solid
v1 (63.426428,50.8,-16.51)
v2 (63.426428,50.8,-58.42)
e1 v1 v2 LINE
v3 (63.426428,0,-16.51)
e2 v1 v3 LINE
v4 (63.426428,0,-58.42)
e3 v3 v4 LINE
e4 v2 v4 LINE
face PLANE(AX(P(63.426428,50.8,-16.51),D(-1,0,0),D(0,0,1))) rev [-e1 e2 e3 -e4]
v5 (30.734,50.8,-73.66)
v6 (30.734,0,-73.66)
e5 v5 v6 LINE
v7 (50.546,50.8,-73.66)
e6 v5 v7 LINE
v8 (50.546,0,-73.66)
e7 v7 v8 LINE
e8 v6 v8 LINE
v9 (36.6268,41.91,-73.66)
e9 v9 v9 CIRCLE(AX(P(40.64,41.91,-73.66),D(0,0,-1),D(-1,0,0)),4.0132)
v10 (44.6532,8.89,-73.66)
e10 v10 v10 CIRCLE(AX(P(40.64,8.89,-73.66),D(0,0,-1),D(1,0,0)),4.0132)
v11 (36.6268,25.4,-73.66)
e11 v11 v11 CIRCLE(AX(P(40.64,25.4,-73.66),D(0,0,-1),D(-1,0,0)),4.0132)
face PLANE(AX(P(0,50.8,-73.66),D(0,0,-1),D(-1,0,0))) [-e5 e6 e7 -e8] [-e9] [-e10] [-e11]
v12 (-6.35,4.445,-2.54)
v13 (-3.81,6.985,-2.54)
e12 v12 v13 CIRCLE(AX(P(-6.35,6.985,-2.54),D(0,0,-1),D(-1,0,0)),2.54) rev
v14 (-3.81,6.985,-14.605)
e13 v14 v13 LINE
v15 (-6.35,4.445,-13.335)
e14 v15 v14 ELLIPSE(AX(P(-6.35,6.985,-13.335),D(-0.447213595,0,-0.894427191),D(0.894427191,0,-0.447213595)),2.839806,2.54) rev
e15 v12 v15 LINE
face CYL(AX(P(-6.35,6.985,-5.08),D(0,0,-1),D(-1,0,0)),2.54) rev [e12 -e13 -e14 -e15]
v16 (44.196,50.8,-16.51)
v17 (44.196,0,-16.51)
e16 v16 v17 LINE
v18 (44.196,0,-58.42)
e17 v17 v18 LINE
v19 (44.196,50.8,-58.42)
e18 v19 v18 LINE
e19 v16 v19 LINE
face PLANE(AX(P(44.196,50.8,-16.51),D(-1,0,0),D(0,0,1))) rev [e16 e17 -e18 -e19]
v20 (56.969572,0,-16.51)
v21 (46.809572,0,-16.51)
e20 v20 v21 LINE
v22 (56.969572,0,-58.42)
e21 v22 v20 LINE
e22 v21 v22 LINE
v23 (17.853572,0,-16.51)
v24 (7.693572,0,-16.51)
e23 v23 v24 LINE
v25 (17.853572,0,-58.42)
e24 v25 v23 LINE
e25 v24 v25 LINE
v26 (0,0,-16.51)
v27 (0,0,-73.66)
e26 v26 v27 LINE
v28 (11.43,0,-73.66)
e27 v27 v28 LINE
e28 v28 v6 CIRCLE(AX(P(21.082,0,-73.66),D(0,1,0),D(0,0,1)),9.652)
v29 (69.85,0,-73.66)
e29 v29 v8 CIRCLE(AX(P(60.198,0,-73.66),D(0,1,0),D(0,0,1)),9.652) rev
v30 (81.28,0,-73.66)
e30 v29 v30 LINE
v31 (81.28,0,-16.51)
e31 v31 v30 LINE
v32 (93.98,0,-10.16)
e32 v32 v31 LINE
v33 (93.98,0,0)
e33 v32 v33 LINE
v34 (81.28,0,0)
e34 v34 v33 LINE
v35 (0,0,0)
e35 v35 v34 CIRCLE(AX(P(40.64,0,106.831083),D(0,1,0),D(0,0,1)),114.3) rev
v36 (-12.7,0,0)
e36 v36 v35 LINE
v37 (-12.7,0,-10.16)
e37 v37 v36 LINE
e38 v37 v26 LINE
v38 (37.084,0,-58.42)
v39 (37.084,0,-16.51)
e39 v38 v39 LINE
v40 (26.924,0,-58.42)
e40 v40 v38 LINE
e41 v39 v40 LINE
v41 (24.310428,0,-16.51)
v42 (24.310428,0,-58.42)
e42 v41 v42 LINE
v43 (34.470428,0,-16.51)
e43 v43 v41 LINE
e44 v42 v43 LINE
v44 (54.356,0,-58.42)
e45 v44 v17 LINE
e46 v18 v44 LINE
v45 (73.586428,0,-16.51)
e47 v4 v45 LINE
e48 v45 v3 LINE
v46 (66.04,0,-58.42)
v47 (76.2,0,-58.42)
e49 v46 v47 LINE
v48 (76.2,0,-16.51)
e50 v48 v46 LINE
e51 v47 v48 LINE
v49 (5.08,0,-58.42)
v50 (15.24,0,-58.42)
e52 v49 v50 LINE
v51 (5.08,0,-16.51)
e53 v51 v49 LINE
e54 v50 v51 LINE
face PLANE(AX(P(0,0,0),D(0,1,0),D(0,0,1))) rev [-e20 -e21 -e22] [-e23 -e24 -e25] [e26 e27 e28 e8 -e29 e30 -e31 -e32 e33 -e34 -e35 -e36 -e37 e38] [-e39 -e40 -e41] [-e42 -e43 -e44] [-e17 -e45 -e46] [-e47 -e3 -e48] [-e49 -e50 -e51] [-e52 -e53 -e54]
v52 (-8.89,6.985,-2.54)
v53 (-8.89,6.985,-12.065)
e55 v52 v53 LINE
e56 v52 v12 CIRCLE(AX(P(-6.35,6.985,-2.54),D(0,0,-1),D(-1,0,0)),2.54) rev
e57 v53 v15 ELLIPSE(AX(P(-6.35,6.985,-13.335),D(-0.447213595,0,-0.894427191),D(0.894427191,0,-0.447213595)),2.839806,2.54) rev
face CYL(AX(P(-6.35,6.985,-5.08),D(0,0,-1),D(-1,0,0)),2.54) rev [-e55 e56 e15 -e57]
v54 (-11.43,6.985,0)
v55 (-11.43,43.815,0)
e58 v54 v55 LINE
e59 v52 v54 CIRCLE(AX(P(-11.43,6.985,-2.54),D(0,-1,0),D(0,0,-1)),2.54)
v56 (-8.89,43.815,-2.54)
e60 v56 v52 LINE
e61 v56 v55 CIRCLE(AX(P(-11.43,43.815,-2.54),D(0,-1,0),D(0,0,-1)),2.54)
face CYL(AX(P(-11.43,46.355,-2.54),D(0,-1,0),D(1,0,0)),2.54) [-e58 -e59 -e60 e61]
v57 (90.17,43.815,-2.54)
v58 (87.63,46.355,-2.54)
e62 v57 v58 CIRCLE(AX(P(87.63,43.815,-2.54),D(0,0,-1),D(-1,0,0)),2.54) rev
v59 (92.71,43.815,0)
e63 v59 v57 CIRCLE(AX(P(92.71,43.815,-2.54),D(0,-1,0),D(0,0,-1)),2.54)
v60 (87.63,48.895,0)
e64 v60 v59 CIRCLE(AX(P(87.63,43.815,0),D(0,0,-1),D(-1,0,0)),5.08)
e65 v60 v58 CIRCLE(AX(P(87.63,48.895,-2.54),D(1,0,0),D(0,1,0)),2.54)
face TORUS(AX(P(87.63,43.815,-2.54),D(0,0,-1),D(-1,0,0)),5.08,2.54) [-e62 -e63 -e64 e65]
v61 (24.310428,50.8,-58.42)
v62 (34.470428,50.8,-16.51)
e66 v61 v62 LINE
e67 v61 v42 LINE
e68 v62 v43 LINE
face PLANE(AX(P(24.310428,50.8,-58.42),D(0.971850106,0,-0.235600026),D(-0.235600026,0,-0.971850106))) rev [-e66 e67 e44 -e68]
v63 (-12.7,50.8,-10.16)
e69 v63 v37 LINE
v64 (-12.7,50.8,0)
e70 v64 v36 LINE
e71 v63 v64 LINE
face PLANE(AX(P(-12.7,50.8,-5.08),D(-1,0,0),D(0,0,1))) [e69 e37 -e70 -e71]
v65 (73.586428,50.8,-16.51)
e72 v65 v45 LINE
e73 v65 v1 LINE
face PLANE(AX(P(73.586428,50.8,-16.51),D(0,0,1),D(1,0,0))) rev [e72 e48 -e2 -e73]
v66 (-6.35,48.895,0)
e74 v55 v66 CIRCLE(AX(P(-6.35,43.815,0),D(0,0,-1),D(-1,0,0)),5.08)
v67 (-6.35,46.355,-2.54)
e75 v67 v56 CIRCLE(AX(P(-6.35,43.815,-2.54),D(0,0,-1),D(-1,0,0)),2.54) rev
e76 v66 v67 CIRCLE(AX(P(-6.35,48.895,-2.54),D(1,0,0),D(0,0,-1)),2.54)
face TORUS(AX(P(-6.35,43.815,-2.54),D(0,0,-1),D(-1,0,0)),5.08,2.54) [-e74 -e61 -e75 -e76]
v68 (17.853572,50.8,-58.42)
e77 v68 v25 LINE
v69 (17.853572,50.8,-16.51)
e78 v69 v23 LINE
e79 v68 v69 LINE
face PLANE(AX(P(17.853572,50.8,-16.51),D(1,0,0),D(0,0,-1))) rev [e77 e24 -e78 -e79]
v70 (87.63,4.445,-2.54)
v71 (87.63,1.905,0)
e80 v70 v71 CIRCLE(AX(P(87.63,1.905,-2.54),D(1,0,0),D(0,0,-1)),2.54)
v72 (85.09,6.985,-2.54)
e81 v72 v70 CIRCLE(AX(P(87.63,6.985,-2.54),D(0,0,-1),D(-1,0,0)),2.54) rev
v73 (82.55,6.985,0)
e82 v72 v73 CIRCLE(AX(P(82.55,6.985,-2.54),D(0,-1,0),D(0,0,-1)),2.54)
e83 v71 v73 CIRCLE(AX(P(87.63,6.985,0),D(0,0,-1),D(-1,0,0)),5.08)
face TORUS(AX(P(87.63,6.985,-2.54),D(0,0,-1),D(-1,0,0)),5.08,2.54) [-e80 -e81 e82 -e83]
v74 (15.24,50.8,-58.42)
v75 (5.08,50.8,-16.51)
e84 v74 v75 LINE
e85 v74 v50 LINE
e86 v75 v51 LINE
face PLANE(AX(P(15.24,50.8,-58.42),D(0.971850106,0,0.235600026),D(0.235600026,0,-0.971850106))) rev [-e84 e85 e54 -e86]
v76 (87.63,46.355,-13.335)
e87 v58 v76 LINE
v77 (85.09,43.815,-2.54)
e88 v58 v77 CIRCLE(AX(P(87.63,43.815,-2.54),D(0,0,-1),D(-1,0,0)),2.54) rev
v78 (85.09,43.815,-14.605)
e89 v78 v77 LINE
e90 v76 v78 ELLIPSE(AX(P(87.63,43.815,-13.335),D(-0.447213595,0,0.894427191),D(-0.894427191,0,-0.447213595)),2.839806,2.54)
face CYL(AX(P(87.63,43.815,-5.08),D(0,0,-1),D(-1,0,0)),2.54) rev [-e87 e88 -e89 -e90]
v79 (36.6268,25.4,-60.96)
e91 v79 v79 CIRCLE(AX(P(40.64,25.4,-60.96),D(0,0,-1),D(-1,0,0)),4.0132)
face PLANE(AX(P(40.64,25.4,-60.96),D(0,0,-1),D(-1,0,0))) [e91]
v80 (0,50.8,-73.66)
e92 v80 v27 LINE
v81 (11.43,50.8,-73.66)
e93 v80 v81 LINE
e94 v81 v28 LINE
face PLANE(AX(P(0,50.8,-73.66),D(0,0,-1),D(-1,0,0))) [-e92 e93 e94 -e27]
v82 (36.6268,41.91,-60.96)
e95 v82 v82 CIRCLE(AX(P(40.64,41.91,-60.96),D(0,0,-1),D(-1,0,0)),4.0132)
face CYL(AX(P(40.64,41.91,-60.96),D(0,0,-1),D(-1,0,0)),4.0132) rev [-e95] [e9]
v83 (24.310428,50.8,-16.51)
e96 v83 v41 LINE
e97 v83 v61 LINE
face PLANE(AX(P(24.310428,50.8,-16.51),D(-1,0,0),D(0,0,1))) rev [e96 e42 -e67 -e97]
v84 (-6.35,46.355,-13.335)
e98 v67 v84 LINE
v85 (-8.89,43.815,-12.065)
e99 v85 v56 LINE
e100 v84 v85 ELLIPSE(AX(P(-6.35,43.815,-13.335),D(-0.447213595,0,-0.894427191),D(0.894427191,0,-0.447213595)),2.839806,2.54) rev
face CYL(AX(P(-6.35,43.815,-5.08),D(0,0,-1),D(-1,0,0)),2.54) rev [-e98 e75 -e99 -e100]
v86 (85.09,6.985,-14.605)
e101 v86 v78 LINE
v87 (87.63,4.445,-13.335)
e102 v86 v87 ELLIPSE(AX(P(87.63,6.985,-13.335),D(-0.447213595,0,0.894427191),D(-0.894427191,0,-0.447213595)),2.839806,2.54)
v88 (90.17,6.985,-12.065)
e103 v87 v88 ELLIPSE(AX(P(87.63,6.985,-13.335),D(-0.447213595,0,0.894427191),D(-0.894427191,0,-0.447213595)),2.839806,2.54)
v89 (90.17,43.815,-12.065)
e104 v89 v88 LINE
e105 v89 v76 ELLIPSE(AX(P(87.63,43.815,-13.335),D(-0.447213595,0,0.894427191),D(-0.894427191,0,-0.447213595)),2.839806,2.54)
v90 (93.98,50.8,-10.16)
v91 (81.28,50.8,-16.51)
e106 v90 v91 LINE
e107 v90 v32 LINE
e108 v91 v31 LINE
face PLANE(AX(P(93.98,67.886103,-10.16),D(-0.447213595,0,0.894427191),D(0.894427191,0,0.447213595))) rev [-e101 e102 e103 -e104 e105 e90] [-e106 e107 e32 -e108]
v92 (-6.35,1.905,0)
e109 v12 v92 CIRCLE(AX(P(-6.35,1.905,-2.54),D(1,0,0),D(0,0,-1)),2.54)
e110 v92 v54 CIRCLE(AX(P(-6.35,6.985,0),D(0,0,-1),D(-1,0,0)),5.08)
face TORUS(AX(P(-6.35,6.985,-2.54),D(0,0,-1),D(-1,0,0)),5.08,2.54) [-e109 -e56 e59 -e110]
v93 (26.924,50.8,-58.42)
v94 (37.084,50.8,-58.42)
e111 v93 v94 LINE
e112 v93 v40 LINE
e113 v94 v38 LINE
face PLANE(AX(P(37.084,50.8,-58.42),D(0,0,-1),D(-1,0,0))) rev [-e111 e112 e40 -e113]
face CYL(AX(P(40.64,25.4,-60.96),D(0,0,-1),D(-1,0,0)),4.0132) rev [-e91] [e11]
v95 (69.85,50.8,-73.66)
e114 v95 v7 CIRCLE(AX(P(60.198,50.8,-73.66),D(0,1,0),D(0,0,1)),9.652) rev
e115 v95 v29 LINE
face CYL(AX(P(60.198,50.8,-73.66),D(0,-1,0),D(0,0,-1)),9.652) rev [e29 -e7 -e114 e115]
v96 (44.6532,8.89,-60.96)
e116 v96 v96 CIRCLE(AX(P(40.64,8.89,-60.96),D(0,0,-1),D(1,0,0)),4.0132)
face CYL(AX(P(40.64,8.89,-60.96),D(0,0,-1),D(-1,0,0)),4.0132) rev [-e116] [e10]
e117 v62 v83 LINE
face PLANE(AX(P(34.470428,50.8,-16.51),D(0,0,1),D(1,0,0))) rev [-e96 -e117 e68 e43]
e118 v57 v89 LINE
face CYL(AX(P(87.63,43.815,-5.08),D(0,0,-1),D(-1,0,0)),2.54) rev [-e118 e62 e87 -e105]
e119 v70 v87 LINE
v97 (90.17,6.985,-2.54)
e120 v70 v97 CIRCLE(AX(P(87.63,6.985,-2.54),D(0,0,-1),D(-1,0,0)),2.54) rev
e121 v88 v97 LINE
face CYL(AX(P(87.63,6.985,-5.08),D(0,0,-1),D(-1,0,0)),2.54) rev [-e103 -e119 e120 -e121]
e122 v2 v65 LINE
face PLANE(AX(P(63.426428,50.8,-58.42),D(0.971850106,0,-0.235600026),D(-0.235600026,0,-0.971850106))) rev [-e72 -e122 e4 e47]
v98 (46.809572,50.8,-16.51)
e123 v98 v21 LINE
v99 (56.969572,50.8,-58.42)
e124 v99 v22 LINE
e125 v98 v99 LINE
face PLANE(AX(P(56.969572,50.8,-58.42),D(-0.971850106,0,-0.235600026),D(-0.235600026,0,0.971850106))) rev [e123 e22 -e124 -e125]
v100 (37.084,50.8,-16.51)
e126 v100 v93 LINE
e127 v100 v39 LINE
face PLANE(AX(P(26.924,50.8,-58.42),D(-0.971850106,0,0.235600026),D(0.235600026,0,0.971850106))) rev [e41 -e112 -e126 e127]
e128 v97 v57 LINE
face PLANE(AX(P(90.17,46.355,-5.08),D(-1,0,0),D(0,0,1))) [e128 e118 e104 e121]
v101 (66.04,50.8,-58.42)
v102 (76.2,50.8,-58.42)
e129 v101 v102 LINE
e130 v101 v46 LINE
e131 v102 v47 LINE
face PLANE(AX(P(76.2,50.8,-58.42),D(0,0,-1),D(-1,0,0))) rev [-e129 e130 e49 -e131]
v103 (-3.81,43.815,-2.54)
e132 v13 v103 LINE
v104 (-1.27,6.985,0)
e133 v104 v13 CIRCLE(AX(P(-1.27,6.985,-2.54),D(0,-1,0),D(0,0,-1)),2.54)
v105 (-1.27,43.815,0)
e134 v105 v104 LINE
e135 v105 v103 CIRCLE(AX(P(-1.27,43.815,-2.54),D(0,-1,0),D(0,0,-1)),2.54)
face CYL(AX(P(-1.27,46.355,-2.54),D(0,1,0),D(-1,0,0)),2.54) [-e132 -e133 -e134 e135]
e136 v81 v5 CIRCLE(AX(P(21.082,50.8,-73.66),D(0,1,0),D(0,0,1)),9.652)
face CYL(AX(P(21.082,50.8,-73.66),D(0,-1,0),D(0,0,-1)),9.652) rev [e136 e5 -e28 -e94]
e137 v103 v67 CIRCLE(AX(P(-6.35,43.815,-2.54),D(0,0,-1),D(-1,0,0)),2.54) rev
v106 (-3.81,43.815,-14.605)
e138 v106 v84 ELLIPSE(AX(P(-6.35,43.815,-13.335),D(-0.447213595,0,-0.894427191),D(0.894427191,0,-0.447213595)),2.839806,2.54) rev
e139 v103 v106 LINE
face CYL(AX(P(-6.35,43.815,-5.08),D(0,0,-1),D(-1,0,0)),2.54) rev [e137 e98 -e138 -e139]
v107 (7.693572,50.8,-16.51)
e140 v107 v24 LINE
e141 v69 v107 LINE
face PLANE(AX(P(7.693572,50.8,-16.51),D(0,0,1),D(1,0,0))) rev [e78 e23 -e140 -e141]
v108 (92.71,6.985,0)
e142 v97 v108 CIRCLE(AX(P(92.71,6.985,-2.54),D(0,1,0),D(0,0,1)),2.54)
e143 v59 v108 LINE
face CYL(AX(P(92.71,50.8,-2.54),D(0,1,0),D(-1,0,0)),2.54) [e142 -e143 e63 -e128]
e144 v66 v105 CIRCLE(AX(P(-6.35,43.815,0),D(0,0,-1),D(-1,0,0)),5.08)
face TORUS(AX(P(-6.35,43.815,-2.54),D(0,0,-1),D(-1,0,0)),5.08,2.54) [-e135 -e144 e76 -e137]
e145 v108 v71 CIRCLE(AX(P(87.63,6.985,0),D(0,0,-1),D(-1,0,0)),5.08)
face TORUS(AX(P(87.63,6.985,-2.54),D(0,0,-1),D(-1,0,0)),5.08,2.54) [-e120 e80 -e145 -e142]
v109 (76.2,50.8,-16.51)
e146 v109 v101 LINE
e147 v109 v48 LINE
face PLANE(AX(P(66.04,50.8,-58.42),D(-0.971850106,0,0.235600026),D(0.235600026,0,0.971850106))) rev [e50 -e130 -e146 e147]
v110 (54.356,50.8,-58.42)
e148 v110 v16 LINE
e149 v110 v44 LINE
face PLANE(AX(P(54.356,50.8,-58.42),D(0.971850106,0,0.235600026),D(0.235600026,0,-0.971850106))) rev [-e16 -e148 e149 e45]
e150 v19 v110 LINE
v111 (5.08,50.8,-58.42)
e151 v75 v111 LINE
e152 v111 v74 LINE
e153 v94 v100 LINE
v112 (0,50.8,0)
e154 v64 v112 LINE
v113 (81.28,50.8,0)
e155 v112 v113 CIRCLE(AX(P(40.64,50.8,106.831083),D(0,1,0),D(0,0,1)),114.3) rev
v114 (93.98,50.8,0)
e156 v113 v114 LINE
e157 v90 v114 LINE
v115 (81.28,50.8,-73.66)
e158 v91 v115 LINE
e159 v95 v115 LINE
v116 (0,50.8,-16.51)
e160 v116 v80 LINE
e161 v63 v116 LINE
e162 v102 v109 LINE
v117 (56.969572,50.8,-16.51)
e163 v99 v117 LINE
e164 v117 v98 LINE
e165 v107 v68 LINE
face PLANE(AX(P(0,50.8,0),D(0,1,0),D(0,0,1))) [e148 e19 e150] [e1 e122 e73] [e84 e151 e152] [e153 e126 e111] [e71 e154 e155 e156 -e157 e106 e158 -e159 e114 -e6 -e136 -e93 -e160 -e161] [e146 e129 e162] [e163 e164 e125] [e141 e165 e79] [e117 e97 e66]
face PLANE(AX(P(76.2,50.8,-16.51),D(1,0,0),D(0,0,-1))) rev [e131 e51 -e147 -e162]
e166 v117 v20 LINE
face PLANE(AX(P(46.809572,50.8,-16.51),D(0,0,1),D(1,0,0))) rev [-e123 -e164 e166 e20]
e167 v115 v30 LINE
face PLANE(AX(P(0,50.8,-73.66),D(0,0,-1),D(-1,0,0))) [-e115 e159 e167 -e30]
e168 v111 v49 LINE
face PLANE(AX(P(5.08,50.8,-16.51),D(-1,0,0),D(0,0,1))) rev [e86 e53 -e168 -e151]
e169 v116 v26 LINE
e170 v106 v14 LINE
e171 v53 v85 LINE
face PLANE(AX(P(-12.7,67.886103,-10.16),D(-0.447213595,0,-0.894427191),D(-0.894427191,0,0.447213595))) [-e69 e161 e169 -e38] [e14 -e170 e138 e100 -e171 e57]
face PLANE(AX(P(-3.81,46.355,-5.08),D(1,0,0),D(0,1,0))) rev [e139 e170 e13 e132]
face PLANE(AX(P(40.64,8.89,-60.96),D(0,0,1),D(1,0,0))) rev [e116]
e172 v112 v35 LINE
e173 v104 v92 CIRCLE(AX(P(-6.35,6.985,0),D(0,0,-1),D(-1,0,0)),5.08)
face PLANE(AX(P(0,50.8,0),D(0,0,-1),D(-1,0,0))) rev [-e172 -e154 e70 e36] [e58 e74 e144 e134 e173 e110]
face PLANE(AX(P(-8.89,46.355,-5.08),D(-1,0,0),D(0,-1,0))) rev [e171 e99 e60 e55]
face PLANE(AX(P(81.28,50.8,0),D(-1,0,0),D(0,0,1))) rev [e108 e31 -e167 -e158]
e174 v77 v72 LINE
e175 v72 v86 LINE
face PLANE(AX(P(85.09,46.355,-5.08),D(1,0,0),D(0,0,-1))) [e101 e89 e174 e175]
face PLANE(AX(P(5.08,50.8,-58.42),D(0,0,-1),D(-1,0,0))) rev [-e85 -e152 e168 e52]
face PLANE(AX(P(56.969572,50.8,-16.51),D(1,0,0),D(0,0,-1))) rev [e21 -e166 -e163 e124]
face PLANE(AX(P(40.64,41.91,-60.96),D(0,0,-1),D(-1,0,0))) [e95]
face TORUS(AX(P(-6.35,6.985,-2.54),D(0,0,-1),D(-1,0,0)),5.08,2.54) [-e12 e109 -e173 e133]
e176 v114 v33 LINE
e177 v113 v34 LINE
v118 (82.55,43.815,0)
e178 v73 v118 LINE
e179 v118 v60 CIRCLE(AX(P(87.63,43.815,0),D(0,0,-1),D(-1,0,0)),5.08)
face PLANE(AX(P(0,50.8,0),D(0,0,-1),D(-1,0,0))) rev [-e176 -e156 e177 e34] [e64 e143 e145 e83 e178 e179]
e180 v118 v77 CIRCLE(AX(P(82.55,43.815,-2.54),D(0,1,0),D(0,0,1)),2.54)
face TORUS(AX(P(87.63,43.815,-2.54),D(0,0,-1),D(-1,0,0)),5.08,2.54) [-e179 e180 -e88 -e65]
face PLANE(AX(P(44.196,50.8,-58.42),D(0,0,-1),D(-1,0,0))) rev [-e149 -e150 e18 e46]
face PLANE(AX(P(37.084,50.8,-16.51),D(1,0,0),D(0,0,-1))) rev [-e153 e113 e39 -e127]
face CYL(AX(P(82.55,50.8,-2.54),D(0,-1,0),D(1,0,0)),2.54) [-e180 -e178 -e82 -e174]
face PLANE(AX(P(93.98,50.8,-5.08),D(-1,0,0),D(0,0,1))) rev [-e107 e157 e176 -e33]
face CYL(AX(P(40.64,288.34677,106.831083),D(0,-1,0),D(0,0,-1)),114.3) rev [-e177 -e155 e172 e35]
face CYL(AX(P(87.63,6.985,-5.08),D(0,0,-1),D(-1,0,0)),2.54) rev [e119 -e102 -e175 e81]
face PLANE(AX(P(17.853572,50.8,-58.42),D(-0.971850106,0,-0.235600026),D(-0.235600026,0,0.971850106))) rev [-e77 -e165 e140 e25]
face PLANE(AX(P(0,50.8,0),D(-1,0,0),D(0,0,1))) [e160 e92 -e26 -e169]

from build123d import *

# Parameters (mm, degrees)
BOSS_EXTRUDE1_DEPTH     = 50.8
SKETCH2_W               = 12.7
SKETCH2_H               = 50.8
SKETCH2_W_2             = 5.08
SKETCH2_H_2             = 41.91
BOSS_EXTRUDE2_DEPTH     = 5.08
CUT_EXTRUDE1_DEPTH      = 130.763924108
CUT_EXTRUDE1_DEPTH_BACK = 130.763924108
SKETCH5_R               = 4.0132
CUT_EXTRUDE2_DEPTH      = 12.7
BOSS_EXTRUDE3_DEPTH     = 50.8
CUT_EXTRUDE4_DEPTH      = 130.763924108
SKETCH10_W              = 5.08
SKETCH10_H              = 41.91
CUT_EXTRUDE5_DEPTH      = 127.949189836
FILLET1_R               = 2.54
FILLET2_R               = 2.54
FILLET3_R               = 2.54


with BuildPart() as part:
    # Sketch1 → Boss-Extrude1 (new body)
    with BuildSketch(Plane(origin=(0, 0, 0), x_dir=(1, 0, 0), z_dir=(0, 1, 0))):
        with BuildLine():
            Line((0, 0), (40.64, 0))
            Line((40.64, 0), (40.64, 73.66))
            Line((40.64, 73.66), (30.734, 73.66))
            ThreePointArc((30.734, 73.66), (21.082, 64.008), (11.43, 73.66))
            Line((11.43, 73.66), (0, 73.66))
            Line((0, 73.66), (0, 0))
        make_face()
        with BuildLine():
            Line((40.64, 73.66), (40.64, 0))
            Line((40.64, 0), (81.28, 0))
            Line((81.28, 0), (81.28, 73.66))
            Line((81.28, 73.66), (69.85, 73.66))
            ThreePointArc((69.85, 73.66), (60.198, 64.008), (50.546, 73.66))
            Line((50.546, 73.66), (40.64, 73.66))
        make_face()
    extrude(amount=BOSS_EXTRUDE1_DEPTH)

    # Sketch2 → Boss-Extrude2 (add)
    with BuildSketch(Plane.XY):
        with Locations((-6.35, 25.4)):
            Rectangle(SKETCH2_W, SKETCH2_H)
        with Locations((-6.35, 25.4)):
            Rectangle(SKETCH2_W_2, SKETCH2_H_2, mode=Mode.SUBTRACT)
    boss_extrude2 = extrude(amount=-BOSS_EXTRUDE2_DEPTH)

    # Mirror3: Boss-Extrude2 across plane
    add(boss_extrude2.mirror(Plane.ZY.offset(-40.64)))

    # Sketch4 → Cut-Extrude1 (cut, two sides: drawn at the far end of the back side and taken through both)
    with BuildSketch(Plane(origin=(0, 50.8, 0), x_dir=(1, 0, 0), z_dir=(0, 1, 0)).offset(-CUT_EXTRUDE1_DEPTH_BACK)):
        with BuildLine():
            Line((313.835320216, -88.467212956), (81.28, 0))
            ThreePointArc((81.28, 0), (40.64, 7.468916508), (0, 0))
            Line((0, 0), (-232.555320216, -88.467212956))
            Line((-232.555320216, -88.467212956), (-232.555320216, -586.095285833))
            Line((-232.555320216, -586.095285833), (313.835320216, -586.095285833))
            Line((313.835320216, -586.095285833), (313.835320216, -88.467212956))
        make_face()
    extrude(amount=CUT_EXTRUDE1_DEPTH + CUT_EXTRUDE1_DEPTH_BACK, mode=Mode.SUBTRACT)

    # Sketch5 → Cut-Extrude2 (cut)
    with BuildSketch(Plane(origin=(0, 0, -73.66), x_dir=(-1, 0, 0), z_dir=(0, 0, -1))):
        with Locations((-40.64, 41.91)):
            Circle(SKETCH5_R)
        with Locations(Location((-40.64, 8.89, 0), (0, 0, 180))):
            Circle(SKETCH5_R)
        with Locations((-40.64, 25.4)):
            Circle(SKETCH5_R)
    extrude(amount=-CUT_EXTRUDE2_DEPTH, mode=Mode.SUBTRACT)

    # Sketch9 → Boss-Extrude3 (add)
    with BuildSketch(Plane(origin=(0, 0, 0), x_dir=(-1, 0, 0), z_dir=(0, -1, 0))):
        Polygon((0, 5.08), (12.7, 5.08), (12.7, 10.16), (0, 16.51), (0, 8.89), align=None)
    boss_extrude3 = extrude(amount=-BOSS_EXTRUDE3_DEPTH)

    # Sketch7 → Cut-Extrude4 (cut, through all)
    with BuildSketch(Plane.XZ):
        Polygon((5.08, -16.51), (5.08, -58.42), (15.24, -58.42), align=None)
        Polygon((7.693571769, -16.51), (17.853571769, -16.51), (17.853571769, -58.42), align=None)
        Polygon((73.586428231, -16.51), (63.426428231, -16.51), (63.426428231, -58.42), align=None)
        Polygon((66.04, -58.42), (76.2, -16.51), (76.2, -58.42), align=None)
        Polygon((24.310428231, -58.42), (34.470428231, -16.51), (24.310428231, -16.51), align=None)
        Polygon((26.924, -58.42), (37.084, -16.51), (37.084, -58.42), align=None)
        Polygon((44.196, -16.51), (44.196, -58.42), (54.356, -58.42), align=None)
        Polygon((56.969571769, -58.42), (46.809571769, -16.51), (56.969571769, -16.51), align=None)
    extrude(amount=-CUT_EXTRUDE4_DEPTH, mode=Mode.SUBTRACT)

    # Sketch10 → Cut-Extrude5 (cut, through all)
    with BuildSketch(Plane.XY.offset(-5.08)):
        with Locations((-6.35, 25.4)):
            Rectangle(SKETCH10_W, SKETCH10_H)
    cut_extrude5 = extrude(amount=-CUT_EXTRUDE5_DEPTH, mode=Mode.SUBTRACT)

    # Fillet1
    fillet1_edges = [part.edges().sort_by_distance(p)[0] for p in [
        (-3.81, 46.355, -7.3025),
        (-8.89, 46.355, -6.0325),
        (-8.89, 4.445, -6.0325),
        (-3.81, 4.445, -7.3025),
    ]]
    fillet(fillet1_edges, radius=FILLET1_R - 0.0001)  # a hair under: the kernel refuses the full size

    # Mirror4: Boss-Extrude3, Cut-Extrude5 across plane
    add(boss_extrude3.mirror(Plane.ZY.offset(-40.64)))
    add(cut_extrude5.mirror(Plane.ZY.offset(-40.64)), mode=Mode.SUBTRACT)

    # Fillet2
    fillet2_edges = [part.edges().sort_by_distance(p)[0] for p in [
        (90.17, 46.355, -6.0325),
        (85.09, 46.355, -7.3025),
        (85.09, 4.445, -7.3025),
        (90.17, 4.445, -6.0325),
    ]]
    fillet(fillet2_edges, radius=FILLET2_R - 0.0001)  # a hair under: the kernel refuses the full size

    # Fillet3
    fillet3_edges = [part.edges().sort_by_distance(p)[0] for p in [
        (-3.81, 25.4, 0),
        (-8.89, 25.4, 0),
        (-4.553919486, 45.611080514, 0),
        (-8.146080514, 45.611080514, 0),
        (-8.146080514, 5.188919486, 0),
        (-4.553919486, 5.188919486, 0),
        (90.17, 25.4, 0),
        (85.09, 25.4, 0),
        (89.426080514, 45.611080514, 0),
        (85.833919486, 45.611080514, 0),
        (85.833919486, 5.188919486, 0),
        (89.426080514, 5.188919486, 0),
    ]]
    fillet(fillet3_edges, radius=FILLET3_R)


solid = part.part
